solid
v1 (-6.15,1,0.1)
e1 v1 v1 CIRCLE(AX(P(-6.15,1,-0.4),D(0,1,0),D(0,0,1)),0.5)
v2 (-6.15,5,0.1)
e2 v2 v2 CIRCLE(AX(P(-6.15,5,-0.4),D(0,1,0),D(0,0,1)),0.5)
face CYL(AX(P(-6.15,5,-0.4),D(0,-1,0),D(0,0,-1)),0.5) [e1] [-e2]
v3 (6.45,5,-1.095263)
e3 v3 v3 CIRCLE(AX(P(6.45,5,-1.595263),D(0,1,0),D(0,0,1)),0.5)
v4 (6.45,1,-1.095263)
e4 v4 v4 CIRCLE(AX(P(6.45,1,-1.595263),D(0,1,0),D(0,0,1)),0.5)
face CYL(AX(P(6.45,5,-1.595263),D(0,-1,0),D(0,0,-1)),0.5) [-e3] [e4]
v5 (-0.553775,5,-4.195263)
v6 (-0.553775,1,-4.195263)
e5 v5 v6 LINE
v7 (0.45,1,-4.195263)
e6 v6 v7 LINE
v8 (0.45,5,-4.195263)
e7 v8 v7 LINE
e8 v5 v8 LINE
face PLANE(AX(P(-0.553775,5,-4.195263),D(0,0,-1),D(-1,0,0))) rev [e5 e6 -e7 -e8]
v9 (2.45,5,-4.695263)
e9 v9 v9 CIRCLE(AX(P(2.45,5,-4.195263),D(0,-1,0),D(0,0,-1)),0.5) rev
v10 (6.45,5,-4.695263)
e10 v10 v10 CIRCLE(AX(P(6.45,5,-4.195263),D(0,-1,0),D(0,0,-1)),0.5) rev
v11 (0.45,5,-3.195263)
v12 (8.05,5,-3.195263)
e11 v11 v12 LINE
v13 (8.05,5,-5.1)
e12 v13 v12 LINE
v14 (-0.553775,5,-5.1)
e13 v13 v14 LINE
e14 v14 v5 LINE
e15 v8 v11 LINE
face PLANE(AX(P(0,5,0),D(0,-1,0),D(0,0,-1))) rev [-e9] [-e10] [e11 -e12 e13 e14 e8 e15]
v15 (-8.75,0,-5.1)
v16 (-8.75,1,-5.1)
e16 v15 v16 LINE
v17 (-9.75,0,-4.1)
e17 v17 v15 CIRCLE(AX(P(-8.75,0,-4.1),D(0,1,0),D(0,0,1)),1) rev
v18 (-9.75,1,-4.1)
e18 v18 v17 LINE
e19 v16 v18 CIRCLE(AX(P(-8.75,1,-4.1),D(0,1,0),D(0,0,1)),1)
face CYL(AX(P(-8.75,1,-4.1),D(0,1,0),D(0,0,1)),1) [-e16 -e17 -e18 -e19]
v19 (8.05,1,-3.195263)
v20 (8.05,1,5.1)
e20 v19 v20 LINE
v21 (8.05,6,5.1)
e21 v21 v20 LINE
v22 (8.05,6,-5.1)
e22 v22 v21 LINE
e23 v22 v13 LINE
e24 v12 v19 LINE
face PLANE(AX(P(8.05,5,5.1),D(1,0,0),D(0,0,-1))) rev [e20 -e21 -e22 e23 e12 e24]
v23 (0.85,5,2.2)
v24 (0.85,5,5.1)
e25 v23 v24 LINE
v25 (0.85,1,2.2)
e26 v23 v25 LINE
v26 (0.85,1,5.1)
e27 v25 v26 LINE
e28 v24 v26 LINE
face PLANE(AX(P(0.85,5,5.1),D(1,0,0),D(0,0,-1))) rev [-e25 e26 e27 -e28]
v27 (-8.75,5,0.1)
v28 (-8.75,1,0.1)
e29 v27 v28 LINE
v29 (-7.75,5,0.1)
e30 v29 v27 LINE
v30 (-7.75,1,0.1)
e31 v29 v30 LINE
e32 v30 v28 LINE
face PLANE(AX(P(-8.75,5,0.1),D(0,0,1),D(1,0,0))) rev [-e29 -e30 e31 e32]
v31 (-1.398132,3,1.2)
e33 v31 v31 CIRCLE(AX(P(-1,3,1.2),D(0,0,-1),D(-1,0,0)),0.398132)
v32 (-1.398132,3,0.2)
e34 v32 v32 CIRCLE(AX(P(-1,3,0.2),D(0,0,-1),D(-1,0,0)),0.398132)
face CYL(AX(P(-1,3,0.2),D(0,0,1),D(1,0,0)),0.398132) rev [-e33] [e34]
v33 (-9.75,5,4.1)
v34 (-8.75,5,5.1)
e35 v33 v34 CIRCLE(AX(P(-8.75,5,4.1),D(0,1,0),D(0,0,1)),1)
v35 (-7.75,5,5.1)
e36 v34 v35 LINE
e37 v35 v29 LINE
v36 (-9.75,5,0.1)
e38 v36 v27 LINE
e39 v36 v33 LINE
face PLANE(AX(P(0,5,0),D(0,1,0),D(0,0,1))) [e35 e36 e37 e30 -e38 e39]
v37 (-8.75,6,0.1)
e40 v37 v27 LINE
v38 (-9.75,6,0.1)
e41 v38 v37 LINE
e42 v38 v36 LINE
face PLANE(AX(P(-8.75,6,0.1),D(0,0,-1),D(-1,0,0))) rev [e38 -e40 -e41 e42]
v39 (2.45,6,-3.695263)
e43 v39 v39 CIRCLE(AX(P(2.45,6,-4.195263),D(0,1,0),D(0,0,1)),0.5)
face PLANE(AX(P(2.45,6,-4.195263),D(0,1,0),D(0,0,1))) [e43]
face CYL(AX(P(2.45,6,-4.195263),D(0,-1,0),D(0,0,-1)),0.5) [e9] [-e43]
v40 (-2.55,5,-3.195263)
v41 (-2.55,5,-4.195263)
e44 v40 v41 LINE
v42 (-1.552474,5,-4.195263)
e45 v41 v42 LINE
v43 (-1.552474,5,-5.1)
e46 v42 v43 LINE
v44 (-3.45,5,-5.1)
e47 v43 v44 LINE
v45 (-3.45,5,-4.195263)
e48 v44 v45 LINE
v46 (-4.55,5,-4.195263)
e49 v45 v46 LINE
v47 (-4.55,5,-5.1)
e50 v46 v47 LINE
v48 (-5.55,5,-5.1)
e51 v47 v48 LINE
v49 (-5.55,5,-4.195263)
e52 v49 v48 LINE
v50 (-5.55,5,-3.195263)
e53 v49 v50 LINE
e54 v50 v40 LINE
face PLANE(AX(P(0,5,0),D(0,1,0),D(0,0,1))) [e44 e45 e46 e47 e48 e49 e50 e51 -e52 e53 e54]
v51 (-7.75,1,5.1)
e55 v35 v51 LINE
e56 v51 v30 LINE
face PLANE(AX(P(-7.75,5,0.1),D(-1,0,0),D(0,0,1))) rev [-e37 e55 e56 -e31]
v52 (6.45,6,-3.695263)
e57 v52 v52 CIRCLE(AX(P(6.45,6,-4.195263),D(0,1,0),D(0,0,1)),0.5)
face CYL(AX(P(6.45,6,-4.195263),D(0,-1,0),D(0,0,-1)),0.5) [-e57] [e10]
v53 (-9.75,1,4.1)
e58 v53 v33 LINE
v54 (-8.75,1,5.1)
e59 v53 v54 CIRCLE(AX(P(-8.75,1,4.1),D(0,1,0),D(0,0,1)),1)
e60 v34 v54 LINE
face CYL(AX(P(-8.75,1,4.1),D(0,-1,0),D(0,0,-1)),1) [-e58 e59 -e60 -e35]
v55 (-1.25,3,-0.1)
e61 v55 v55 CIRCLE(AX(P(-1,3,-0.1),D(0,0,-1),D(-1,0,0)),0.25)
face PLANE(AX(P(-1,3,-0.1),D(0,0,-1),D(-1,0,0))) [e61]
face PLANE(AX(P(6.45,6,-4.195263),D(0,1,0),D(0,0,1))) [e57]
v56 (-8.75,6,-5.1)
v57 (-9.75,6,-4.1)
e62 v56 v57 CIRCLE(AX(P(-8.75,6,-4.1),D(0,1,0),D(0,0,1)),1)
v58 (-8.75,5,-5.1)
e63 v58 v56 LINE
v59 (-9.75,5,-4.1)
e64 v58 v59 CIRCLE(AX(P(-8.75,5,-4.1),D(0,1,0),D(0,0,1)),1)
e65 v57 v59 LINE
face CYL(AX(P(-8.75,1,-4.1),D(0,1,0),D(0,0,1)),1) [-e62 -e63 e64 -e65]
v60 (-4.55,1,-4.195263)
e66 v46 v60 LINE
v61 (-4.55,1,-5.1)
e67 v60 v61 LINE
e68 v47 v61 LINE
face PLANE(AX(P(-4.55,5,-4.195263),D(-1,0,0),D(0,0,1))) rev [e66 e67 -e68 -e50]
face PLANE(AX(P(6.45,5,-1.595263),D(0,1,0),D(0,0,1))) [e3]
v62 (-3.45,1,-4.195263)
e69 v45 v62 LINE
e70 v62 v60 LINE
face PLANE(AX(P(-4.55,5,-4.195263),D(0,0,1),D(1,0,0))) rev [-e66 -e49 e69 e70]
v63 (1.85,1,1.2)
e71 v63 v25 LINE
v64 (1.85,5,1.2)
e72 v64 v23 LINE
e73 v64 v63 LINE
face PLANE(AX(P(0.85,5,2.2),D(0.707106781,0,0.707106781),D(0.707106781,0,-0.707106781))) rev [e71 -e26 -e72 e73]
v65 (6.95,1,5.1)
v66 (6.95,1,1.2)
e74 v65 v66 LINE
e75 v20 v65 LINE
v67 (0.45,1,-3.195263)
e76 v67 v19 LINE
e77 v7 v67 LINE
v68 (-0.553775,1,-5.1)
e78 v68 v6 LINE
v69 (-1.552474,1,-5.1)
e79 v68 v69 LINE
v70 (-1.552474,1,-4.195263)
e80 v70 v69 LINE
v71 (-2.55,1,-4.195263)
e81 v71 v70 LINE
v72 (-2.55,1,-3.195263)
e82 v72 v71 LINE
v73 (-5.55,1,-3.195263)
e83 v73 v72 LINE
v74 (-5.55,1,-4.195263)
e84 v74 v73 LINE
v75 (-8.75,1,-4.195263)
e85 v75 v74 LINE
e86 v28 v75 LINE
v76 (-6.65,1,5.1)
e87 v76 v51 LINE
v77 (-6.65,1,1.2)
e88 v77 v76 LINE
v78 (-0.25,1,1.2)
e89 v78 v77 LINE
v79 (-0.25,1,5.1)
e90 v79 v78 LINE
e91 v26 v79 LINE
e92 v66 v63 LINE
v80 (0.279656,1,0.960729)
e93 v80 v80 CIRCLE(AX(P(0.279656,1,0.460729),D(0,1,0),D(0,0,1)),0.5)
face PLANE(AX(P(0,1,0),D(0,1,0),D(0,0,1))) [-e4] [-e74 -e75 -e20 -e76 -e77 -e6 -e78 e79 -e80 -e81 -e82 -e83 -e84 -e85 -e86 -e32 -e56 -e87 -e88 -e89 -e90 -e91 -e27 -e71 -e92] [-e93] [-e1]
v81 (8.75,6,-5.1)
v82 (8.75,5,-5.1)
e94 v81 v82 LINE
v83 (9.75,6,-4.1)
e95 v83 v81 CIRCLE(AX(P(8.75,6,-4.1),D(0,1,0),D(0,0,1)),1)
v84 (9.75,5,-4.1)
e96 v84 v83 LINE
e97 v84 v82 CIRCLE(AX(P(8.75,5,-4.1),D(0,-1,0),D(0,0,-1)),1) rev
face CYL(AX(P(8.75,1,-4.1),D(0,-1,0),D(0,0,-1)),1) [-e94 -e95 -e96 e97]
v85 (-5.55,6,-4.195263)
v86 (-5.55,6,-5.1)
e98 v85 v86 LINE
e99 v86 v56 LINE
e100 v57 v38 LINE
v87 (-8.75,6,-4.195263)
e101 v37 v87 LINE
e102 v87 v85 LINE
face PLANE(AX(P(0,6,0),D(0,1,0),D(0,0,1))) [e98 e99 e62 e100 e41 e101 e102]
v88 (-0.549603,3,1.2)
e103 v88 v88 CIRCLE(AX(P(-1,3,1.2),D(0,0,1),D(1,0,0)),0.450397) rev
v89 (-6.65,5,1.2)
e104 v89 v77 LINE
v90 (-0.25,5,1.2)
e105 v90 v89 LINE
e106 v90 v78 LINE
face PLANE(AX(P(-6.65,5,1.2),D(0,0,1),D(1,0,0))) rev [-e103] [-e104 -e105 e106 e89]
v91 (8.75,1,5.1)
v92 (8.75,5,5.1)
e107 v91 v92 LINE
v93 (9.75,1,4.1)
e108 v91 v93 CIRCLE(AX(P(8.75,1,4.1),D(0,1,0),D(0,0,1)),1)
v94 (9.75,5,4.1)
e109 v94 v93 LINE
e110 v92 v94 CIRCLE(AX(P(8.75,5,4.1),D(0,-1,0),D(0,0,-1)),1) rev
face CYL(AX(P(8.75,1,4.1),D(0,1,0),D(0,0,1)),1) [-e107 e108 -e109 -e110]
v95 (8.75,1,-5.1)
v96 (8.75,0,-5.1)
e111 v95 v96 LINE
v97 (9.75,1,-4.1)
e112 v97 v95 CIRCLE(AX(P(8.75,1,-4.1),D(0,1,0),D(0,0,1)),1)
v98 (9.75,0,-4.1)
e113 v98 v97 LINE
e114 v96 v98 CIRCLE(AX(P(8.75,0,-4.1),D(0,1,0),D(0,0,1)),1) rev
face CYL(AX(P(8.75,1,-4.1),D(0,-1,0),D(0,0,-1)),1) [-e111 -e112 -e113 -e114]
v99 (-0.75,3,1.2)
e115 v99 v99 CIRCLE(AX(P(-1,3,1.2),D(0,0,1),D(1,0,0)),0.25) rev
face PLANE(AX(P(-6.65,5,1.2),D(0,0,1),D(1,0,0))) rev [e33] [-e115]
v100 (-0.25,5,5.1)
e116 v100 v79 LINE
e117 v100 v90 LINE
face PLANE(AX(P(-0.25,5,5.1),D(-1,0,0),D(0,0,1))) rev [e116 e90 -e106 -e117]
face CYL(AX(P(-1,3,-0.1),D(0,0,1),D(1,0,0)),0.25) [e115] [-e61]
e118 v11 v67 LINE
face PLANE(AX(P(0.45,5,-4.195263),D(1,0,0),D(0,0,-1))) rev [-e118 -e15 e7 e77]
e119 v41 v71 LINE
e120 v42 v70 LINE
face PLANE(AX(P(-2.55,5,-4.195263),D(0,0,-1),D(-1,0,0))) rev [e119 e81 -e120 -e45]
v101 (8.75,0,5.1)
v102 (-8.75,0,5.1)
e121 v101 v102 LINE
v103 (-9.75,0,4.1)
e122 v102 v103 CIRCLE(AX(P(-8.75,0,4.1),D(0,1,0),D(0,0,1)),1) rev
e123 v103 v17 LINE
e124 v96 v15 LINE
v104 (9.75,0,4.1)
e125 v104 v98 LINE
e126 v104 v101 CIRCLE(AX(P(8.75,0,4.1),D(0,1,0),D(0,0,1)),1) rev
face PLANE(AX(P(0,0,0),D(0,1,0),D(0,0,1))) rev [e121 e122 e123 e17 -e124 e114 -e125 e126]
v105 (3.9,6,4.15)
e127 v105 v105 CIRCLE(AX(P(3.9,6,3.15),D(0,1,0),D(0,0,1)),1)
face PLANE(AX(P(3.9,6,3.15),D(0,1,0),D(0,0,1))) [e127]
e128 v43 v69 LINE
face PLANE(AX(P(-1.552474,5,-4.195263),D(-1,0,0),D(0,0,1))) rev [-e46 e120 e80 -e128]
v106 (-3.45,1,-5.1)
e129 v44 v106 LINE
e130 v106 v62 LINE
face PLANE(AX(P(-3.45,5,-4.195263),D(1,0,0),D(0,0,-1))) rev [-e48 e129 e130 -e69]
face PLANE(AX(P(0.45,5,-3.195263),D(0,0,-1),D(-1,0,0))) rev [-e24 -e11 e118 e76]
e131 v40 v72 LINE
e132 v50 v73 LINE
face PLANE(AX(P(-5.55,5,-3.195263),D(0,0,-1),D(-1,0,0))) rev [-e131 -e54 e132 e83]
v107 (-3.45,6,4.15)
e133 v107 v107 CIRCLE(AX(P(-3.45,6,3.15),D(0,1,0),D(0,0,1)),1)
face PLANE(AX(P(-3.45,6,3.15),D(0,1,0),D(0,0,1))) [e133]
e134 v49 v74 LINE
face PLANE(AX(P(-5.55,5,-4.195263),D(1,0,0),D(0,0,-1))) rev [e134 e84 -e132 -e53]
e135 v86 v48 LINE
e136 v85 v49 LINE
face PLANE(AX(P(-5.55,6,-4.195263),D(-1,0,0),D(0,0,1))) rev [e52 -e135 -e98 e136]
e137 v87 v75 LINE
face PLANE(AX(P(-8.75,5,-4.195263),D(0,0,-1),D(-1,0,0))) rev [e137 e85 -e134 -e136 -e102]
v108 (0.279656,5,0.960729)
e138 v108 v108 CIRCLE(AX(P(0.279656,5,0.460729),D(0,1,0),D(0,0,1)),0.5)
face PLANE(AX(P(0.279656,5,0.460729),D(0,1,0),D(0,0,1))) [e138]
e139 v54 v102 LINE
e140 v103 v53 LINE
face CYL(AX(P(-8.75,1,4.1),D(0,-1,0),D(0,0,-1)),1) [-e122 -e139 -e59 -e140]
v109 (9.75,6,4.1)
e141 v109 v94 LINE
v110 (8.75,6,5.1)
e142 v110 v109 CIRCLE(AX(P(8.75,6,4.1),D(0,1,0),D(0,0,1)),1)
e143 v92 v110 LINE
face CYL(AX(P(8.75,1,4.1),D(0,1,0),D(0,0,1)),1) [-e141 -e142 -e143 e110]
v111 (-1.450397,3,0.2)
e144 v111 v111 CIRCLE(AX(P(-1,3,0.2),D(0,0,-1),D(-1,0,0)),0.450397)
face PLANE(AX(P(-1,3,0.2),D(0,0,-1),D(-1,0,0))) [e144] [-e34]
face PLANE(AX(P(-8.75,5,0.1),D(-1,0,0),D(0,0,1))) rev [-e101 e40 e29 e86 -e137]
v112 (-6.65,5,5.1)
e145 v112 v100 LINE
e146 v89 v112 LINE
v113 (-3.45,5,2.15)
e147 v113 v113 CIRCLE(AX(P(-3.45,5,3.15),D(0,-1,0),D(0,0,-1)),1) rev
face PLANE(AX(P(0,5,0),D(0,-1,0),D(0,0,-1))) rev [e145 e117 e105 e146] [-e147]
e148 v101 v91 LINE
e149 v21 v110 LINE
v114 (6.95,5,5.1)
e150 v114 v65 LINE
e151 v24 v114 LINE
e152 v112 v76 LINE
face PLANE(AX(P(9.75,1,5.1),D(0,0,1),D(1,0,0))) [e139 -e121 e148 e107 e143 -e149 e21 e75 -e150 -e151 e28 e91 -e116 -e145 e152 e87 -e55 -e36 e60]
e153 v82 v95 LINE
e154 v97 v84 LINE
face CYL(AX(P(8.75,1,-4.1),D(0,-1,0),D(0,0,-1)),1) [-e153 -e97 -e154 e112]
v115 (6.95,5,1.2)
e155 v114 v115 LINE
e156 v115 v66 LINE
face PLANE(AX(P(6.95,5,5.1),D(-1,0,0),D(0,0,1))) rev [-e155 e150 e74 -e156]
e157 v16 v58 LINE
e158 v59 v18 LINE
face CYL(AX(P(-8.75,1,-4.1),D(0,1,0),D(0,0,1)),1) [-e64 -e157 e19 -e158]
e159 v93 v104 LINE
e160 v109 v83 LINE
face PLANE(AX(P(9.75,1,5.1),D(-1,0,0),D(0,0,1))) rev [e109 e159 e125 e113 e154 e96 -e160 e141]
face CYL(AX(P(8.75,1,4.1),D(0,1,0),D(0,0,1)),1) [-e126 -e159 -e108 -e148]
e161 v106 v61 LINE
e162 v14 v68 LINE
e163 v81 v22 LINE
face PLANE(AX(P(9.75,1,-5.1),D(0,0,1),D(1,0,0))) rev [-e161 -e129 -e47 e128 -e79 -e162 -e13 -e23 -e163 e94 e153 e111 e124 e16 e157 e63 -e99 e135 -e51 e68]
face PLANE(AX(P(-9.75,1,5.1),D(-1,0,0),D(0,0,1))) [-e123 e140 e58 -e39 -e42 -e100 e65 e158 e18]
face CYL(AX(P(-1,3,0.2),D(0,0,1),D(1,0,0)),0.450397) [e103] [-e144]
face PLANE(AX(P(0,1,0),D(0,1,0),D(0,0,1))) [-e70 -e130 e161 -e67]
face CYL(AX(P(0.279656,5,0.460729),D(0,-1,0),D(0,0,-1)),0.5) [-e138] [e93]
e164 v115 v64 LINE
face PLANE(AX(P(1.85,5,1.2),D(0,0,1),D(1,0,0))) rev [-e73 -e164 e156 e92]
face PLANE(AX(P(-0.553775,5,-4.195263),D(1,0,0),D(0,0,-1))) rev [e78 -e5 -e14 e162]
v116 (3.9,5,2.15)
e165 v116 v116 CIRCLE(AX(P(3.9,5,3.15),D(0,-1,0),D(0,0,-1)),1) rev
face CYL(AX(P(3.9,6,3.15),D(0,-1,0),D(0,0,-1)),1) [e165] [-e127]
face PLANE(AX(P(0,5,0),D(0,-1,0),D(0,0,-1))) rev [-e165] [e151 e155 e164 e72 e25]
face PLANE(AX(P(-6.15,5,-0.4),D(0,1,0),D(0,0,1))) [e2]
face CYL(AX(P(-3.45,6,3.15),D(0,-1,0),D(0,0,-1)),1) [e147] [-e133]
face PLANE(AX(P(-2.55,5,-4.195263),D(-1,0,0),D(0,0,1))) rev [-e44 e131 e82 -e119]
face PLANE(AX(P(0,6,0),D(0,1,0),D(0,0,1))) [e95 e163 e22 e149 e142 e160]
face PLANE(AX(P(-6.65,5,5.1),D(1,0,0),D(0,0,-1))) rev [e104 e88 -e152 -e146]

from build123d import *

# Parameters (mm, degrees)
SZKIC1_W                     = 19.5
SZKIC1_H                     = 10.2
DODANIE_WYCI_GNI_CIE2_DEPTH  = 1
ZAOKR_GLENIE1_R              = 1
ZAOKR_GLENIE2_R              = 1
ZAOKR_GLENIE3_R              = 1
ZAOKR_GLENIE4_R              = 1
SZKIC4_R                     = 0.5
SZKIC4_W                     = 6.4
SZKIC4_H                     = 3.9
DODANIE_WYCI_GNI_CIE4_DEPTH  = 4
ZAOKR_GLENIE5_R              = 1
ZAOKR_GLENIE6_R              = 1
ZAOKR_GLENIE7_R              = 1
ZAOKR_GLENIE8_R              = 1
SZKIC8_R                     = 1
SZKIC8_R_2                   = 0.5
SZKIC8_W                     = 1.7
SZKIC8_H                     = 10.2
DODANIE_WYCI_GNI_CIE12_DEPTH = 1
ZAOKR_GLENIE12_R             = 1
SZKIC12_R                    = 0.25
DODANIE_WYCI_GNI_CIE14_DEPTH = 1.3
SZKIC15_R                    = 0.450396943
SZKIC15_R_2                  = 0.398132247
DODANIE_WYCI_GNI_CIE15_DEPTH = 1


with BuildPart() as part:
    # Szkic1 → Dodanie-wyciągnięcie2 (new body)
    with BuildSketch(Plane(origin=(0, 0, 0), x_dir=(1, 0, 0), z_dir=(0, 1, 0))):
        Rectangle(SZKIC1_W, SZKIC1_H)
    extrude(amount=DODANIE_WYCI_GNI_CIE2_DEPTH)

    # Zaokrąglenie1
    zaokr_glenie1_edges = [part.edges().sort_by_distance(p)[0] for p in [
        (-9.75, 0.5, 5.1),
    ]]
    fillet(zaokr_glenie1_edges, radius=ZAOKR_GLENIE1_R)

    # Zaokrąglenie2
    zaokr_glenie2_edges = [part.edges().sort_by_distance(p)[0] for p in [
        (-9.75, 0.5, -5.1),
    ]]
    fillet(zaokr_glenie2_edges, radius=ZAOKR_GLENIE2_R)

    # Zaokrąglenie3
    zaokr_glenie3_edges = [part.edges().sort_by_distance(p)[0] for p in [
        (9.75, 0.5, 5.1),
    ]]
    fillet(zaokr_glenie3_edges, radius=ZAOKR_GLENIE3_R)

    # Zaokrąglenie4
    zaokr_glenie4_edges = [part.edges().sort_by_distance(p)[0] for p in [
        (9.75, 0.5, -5.1),
    ]]
    fillet(zaokr_glenie4_edges, radius=ZAOKR_GLENIE4_R)

    # Szkic4 → Dodanie-wyciągnięcie4 (add)
    with BuildSketch(Plane(origin=(0, 1, 0), x_dir=(1, 0, 0), z_dir=(0, 1, 0))):
        with Locations(Location((0.279656429, -0.460729366, 0), (0, 0, 270))):
            Circle(SZKIC4_R)
        with Locations(Location((-6.15, 0.4, 0), (0, 0, 270))):
            Circle(SZKIC4_R)
        with Locations(Location((6.45, 1.595263288, 0), (0, 0, 270))):
            Circle(SZKIC4_R)
        Polygon((-8.75, -0.1), (-7.75, -0.1), (-7.75, -5.1), (-9.75, -5.1), (-9.75, 5.1), (-4.55, 5.1), (-4.55, 4.195263288), (-3.45, 4.195263288), (-3.45, 5.1), (-1.552474018, 5.1), (-1.552474018, 4.195263288), (-2.55, 4.195263288), (-2.55, 3.195263288), (-5.55, 3.195263288), (-5.55, 4.195263288), (-8.75, 4.195263288), align=None)
        with Locations((-3.45, -3.15)):
            Rectangle(SZKIC4_W, SZKIC4_H)
        Polygon((0.85, -5.1), (6.95, -5.1), (6.95, -1.2), (1.85, -1.2), (0.85, -2.2), align=None)
        Polygon((8.05, -5.1), (9.75, -5.1), (9.75, 5.1), (-0.553774682, 5.1), (-0.553774682, 4.195263288), (0.45, 4.195263288), (0.45, 3.195263288), (8.05, 3.195263288), align=None)
    extrude(amount=DODANIE_WYCI_GNI_CIE4_DEPTH)

    # Zaokrąglenie5
    zaokr_glenie5_edges = [part.edges().sort_by_distance(p)[0] for p in [
        (-9.75, 3, 5.1),
    ]]
    fillet(zaokr_glenie5_edges, radius=ZAOKR_GLENIE5_R)

    # Zaokrąglenie6
    zaokr_glenie6_edges = [part.edges().sort_by_distance(p)[0] for p in [
        (-9.75, 3, -5.1),
    ]]
    fillet(zaokr_glenie6_edges, radius=ZAOKR_GLENIE6_R)

    # Zaokrąglenie7
    zaokr_glenie7_edges = [part.edges().sort_by_distance(p)[0] for p in [
        (9.75, 3, -5.1),
    ]]
    fillet(zaokr_glenie7_edges, radius=ZAOKR_GLENIE7_R)

    # Zaokrąglenie8
    zaokr_glenie8_edges = [part.edges().sort_by_distance(p)[0] for p in [
        (9.75, 3, 5.1),
    ]]
    fillet(zaokr_glenie8_edges, radius=ZAOKR_GLENIE8_R)

    # Szkic8 → Dodanie-wyciągnięcie12 (add)
    with BuildSketch(Plane(origin=(0, 5, 0), x_dir=(1, 0, 0), z_dir=(0, 1, 0))):
        with Locations(Location((-3.45, -3.15, 0), (0, 0, 90))):
            Circle(SZKIC8_R)
        with Locations(Location((3.9, -3.15, 0), (0, 0, 90))):
            Circle(SZKIC8_R)
        with Locations(Location((6.45, 4.195263288, 0), (0, 0, 90))):
            Circle(SZKIC8_R_2)
        with Locations(Location((2.45, 4.195263288, 0), (0, 0, 90))):
            Circle(SZKIC8_R_2)
        Polygon((-8.75, -0.1), (-9.75, -0.1), (-9.75, 5.1), (-5.55, 5.1), (-5.55, 4.195263288), (-8.75, 4.195263288), align=None)
        with Locations((8.9, 0)):
            Rectangle(SZKIC8_W, SZKIC8_H)
    extrude(amount=DODANIE_WYCI_GNI_CIE12_DEPTH)

    # Zaokrąglenie12
    zaokr_glenie12_edges = [part.edges().sort_by_distance(p)[0] for p in [
        (9.75, 5.5, -5.1),
        (9.75, 5.5, 5.1),
        (-9.75, 5.5, -5.1),
    ]]
    fillet(zaokr_glenie12_edges, radius=ZAOKR_GLENIE12_R - 0.0001)  # a hair under: the kernel refuses the full size

    # Szkic12 → Dodanie-wyciągnięcie14 (add)
    with BuildSketch(Plane(origin=(0, 0, 1.2), x_dir=(-1, 0, 0), z_dir=(0, 0, -1))):
        with Locations(Location((1, 3, 0), (0, 0, 180))):
            Circle(SZKIC12_R)
    extrude(amount=DODANIE_WYCI_GNI_CIE14_DEPTH)

    # Szkic15 → Dodanie-wyciągnięcie15 (add)
    with BuildSketch(Plane(origin=(0, 0, 1.2), x_dir=(-1, 0, 0), z_dir=(0, 0, -1))):
        with Locations(Location((1, 3, 0), (0, 0, 180))):
            Circle(SZKIC15_R)
        with Locations((1, 3)):
            Circle(SZKIC15_R_2, mode=Mode.SUBTRACT)
    extrude(amount=DODANIE_WYCI_GNI_CIE15_DEPTH)


solid = part.part
